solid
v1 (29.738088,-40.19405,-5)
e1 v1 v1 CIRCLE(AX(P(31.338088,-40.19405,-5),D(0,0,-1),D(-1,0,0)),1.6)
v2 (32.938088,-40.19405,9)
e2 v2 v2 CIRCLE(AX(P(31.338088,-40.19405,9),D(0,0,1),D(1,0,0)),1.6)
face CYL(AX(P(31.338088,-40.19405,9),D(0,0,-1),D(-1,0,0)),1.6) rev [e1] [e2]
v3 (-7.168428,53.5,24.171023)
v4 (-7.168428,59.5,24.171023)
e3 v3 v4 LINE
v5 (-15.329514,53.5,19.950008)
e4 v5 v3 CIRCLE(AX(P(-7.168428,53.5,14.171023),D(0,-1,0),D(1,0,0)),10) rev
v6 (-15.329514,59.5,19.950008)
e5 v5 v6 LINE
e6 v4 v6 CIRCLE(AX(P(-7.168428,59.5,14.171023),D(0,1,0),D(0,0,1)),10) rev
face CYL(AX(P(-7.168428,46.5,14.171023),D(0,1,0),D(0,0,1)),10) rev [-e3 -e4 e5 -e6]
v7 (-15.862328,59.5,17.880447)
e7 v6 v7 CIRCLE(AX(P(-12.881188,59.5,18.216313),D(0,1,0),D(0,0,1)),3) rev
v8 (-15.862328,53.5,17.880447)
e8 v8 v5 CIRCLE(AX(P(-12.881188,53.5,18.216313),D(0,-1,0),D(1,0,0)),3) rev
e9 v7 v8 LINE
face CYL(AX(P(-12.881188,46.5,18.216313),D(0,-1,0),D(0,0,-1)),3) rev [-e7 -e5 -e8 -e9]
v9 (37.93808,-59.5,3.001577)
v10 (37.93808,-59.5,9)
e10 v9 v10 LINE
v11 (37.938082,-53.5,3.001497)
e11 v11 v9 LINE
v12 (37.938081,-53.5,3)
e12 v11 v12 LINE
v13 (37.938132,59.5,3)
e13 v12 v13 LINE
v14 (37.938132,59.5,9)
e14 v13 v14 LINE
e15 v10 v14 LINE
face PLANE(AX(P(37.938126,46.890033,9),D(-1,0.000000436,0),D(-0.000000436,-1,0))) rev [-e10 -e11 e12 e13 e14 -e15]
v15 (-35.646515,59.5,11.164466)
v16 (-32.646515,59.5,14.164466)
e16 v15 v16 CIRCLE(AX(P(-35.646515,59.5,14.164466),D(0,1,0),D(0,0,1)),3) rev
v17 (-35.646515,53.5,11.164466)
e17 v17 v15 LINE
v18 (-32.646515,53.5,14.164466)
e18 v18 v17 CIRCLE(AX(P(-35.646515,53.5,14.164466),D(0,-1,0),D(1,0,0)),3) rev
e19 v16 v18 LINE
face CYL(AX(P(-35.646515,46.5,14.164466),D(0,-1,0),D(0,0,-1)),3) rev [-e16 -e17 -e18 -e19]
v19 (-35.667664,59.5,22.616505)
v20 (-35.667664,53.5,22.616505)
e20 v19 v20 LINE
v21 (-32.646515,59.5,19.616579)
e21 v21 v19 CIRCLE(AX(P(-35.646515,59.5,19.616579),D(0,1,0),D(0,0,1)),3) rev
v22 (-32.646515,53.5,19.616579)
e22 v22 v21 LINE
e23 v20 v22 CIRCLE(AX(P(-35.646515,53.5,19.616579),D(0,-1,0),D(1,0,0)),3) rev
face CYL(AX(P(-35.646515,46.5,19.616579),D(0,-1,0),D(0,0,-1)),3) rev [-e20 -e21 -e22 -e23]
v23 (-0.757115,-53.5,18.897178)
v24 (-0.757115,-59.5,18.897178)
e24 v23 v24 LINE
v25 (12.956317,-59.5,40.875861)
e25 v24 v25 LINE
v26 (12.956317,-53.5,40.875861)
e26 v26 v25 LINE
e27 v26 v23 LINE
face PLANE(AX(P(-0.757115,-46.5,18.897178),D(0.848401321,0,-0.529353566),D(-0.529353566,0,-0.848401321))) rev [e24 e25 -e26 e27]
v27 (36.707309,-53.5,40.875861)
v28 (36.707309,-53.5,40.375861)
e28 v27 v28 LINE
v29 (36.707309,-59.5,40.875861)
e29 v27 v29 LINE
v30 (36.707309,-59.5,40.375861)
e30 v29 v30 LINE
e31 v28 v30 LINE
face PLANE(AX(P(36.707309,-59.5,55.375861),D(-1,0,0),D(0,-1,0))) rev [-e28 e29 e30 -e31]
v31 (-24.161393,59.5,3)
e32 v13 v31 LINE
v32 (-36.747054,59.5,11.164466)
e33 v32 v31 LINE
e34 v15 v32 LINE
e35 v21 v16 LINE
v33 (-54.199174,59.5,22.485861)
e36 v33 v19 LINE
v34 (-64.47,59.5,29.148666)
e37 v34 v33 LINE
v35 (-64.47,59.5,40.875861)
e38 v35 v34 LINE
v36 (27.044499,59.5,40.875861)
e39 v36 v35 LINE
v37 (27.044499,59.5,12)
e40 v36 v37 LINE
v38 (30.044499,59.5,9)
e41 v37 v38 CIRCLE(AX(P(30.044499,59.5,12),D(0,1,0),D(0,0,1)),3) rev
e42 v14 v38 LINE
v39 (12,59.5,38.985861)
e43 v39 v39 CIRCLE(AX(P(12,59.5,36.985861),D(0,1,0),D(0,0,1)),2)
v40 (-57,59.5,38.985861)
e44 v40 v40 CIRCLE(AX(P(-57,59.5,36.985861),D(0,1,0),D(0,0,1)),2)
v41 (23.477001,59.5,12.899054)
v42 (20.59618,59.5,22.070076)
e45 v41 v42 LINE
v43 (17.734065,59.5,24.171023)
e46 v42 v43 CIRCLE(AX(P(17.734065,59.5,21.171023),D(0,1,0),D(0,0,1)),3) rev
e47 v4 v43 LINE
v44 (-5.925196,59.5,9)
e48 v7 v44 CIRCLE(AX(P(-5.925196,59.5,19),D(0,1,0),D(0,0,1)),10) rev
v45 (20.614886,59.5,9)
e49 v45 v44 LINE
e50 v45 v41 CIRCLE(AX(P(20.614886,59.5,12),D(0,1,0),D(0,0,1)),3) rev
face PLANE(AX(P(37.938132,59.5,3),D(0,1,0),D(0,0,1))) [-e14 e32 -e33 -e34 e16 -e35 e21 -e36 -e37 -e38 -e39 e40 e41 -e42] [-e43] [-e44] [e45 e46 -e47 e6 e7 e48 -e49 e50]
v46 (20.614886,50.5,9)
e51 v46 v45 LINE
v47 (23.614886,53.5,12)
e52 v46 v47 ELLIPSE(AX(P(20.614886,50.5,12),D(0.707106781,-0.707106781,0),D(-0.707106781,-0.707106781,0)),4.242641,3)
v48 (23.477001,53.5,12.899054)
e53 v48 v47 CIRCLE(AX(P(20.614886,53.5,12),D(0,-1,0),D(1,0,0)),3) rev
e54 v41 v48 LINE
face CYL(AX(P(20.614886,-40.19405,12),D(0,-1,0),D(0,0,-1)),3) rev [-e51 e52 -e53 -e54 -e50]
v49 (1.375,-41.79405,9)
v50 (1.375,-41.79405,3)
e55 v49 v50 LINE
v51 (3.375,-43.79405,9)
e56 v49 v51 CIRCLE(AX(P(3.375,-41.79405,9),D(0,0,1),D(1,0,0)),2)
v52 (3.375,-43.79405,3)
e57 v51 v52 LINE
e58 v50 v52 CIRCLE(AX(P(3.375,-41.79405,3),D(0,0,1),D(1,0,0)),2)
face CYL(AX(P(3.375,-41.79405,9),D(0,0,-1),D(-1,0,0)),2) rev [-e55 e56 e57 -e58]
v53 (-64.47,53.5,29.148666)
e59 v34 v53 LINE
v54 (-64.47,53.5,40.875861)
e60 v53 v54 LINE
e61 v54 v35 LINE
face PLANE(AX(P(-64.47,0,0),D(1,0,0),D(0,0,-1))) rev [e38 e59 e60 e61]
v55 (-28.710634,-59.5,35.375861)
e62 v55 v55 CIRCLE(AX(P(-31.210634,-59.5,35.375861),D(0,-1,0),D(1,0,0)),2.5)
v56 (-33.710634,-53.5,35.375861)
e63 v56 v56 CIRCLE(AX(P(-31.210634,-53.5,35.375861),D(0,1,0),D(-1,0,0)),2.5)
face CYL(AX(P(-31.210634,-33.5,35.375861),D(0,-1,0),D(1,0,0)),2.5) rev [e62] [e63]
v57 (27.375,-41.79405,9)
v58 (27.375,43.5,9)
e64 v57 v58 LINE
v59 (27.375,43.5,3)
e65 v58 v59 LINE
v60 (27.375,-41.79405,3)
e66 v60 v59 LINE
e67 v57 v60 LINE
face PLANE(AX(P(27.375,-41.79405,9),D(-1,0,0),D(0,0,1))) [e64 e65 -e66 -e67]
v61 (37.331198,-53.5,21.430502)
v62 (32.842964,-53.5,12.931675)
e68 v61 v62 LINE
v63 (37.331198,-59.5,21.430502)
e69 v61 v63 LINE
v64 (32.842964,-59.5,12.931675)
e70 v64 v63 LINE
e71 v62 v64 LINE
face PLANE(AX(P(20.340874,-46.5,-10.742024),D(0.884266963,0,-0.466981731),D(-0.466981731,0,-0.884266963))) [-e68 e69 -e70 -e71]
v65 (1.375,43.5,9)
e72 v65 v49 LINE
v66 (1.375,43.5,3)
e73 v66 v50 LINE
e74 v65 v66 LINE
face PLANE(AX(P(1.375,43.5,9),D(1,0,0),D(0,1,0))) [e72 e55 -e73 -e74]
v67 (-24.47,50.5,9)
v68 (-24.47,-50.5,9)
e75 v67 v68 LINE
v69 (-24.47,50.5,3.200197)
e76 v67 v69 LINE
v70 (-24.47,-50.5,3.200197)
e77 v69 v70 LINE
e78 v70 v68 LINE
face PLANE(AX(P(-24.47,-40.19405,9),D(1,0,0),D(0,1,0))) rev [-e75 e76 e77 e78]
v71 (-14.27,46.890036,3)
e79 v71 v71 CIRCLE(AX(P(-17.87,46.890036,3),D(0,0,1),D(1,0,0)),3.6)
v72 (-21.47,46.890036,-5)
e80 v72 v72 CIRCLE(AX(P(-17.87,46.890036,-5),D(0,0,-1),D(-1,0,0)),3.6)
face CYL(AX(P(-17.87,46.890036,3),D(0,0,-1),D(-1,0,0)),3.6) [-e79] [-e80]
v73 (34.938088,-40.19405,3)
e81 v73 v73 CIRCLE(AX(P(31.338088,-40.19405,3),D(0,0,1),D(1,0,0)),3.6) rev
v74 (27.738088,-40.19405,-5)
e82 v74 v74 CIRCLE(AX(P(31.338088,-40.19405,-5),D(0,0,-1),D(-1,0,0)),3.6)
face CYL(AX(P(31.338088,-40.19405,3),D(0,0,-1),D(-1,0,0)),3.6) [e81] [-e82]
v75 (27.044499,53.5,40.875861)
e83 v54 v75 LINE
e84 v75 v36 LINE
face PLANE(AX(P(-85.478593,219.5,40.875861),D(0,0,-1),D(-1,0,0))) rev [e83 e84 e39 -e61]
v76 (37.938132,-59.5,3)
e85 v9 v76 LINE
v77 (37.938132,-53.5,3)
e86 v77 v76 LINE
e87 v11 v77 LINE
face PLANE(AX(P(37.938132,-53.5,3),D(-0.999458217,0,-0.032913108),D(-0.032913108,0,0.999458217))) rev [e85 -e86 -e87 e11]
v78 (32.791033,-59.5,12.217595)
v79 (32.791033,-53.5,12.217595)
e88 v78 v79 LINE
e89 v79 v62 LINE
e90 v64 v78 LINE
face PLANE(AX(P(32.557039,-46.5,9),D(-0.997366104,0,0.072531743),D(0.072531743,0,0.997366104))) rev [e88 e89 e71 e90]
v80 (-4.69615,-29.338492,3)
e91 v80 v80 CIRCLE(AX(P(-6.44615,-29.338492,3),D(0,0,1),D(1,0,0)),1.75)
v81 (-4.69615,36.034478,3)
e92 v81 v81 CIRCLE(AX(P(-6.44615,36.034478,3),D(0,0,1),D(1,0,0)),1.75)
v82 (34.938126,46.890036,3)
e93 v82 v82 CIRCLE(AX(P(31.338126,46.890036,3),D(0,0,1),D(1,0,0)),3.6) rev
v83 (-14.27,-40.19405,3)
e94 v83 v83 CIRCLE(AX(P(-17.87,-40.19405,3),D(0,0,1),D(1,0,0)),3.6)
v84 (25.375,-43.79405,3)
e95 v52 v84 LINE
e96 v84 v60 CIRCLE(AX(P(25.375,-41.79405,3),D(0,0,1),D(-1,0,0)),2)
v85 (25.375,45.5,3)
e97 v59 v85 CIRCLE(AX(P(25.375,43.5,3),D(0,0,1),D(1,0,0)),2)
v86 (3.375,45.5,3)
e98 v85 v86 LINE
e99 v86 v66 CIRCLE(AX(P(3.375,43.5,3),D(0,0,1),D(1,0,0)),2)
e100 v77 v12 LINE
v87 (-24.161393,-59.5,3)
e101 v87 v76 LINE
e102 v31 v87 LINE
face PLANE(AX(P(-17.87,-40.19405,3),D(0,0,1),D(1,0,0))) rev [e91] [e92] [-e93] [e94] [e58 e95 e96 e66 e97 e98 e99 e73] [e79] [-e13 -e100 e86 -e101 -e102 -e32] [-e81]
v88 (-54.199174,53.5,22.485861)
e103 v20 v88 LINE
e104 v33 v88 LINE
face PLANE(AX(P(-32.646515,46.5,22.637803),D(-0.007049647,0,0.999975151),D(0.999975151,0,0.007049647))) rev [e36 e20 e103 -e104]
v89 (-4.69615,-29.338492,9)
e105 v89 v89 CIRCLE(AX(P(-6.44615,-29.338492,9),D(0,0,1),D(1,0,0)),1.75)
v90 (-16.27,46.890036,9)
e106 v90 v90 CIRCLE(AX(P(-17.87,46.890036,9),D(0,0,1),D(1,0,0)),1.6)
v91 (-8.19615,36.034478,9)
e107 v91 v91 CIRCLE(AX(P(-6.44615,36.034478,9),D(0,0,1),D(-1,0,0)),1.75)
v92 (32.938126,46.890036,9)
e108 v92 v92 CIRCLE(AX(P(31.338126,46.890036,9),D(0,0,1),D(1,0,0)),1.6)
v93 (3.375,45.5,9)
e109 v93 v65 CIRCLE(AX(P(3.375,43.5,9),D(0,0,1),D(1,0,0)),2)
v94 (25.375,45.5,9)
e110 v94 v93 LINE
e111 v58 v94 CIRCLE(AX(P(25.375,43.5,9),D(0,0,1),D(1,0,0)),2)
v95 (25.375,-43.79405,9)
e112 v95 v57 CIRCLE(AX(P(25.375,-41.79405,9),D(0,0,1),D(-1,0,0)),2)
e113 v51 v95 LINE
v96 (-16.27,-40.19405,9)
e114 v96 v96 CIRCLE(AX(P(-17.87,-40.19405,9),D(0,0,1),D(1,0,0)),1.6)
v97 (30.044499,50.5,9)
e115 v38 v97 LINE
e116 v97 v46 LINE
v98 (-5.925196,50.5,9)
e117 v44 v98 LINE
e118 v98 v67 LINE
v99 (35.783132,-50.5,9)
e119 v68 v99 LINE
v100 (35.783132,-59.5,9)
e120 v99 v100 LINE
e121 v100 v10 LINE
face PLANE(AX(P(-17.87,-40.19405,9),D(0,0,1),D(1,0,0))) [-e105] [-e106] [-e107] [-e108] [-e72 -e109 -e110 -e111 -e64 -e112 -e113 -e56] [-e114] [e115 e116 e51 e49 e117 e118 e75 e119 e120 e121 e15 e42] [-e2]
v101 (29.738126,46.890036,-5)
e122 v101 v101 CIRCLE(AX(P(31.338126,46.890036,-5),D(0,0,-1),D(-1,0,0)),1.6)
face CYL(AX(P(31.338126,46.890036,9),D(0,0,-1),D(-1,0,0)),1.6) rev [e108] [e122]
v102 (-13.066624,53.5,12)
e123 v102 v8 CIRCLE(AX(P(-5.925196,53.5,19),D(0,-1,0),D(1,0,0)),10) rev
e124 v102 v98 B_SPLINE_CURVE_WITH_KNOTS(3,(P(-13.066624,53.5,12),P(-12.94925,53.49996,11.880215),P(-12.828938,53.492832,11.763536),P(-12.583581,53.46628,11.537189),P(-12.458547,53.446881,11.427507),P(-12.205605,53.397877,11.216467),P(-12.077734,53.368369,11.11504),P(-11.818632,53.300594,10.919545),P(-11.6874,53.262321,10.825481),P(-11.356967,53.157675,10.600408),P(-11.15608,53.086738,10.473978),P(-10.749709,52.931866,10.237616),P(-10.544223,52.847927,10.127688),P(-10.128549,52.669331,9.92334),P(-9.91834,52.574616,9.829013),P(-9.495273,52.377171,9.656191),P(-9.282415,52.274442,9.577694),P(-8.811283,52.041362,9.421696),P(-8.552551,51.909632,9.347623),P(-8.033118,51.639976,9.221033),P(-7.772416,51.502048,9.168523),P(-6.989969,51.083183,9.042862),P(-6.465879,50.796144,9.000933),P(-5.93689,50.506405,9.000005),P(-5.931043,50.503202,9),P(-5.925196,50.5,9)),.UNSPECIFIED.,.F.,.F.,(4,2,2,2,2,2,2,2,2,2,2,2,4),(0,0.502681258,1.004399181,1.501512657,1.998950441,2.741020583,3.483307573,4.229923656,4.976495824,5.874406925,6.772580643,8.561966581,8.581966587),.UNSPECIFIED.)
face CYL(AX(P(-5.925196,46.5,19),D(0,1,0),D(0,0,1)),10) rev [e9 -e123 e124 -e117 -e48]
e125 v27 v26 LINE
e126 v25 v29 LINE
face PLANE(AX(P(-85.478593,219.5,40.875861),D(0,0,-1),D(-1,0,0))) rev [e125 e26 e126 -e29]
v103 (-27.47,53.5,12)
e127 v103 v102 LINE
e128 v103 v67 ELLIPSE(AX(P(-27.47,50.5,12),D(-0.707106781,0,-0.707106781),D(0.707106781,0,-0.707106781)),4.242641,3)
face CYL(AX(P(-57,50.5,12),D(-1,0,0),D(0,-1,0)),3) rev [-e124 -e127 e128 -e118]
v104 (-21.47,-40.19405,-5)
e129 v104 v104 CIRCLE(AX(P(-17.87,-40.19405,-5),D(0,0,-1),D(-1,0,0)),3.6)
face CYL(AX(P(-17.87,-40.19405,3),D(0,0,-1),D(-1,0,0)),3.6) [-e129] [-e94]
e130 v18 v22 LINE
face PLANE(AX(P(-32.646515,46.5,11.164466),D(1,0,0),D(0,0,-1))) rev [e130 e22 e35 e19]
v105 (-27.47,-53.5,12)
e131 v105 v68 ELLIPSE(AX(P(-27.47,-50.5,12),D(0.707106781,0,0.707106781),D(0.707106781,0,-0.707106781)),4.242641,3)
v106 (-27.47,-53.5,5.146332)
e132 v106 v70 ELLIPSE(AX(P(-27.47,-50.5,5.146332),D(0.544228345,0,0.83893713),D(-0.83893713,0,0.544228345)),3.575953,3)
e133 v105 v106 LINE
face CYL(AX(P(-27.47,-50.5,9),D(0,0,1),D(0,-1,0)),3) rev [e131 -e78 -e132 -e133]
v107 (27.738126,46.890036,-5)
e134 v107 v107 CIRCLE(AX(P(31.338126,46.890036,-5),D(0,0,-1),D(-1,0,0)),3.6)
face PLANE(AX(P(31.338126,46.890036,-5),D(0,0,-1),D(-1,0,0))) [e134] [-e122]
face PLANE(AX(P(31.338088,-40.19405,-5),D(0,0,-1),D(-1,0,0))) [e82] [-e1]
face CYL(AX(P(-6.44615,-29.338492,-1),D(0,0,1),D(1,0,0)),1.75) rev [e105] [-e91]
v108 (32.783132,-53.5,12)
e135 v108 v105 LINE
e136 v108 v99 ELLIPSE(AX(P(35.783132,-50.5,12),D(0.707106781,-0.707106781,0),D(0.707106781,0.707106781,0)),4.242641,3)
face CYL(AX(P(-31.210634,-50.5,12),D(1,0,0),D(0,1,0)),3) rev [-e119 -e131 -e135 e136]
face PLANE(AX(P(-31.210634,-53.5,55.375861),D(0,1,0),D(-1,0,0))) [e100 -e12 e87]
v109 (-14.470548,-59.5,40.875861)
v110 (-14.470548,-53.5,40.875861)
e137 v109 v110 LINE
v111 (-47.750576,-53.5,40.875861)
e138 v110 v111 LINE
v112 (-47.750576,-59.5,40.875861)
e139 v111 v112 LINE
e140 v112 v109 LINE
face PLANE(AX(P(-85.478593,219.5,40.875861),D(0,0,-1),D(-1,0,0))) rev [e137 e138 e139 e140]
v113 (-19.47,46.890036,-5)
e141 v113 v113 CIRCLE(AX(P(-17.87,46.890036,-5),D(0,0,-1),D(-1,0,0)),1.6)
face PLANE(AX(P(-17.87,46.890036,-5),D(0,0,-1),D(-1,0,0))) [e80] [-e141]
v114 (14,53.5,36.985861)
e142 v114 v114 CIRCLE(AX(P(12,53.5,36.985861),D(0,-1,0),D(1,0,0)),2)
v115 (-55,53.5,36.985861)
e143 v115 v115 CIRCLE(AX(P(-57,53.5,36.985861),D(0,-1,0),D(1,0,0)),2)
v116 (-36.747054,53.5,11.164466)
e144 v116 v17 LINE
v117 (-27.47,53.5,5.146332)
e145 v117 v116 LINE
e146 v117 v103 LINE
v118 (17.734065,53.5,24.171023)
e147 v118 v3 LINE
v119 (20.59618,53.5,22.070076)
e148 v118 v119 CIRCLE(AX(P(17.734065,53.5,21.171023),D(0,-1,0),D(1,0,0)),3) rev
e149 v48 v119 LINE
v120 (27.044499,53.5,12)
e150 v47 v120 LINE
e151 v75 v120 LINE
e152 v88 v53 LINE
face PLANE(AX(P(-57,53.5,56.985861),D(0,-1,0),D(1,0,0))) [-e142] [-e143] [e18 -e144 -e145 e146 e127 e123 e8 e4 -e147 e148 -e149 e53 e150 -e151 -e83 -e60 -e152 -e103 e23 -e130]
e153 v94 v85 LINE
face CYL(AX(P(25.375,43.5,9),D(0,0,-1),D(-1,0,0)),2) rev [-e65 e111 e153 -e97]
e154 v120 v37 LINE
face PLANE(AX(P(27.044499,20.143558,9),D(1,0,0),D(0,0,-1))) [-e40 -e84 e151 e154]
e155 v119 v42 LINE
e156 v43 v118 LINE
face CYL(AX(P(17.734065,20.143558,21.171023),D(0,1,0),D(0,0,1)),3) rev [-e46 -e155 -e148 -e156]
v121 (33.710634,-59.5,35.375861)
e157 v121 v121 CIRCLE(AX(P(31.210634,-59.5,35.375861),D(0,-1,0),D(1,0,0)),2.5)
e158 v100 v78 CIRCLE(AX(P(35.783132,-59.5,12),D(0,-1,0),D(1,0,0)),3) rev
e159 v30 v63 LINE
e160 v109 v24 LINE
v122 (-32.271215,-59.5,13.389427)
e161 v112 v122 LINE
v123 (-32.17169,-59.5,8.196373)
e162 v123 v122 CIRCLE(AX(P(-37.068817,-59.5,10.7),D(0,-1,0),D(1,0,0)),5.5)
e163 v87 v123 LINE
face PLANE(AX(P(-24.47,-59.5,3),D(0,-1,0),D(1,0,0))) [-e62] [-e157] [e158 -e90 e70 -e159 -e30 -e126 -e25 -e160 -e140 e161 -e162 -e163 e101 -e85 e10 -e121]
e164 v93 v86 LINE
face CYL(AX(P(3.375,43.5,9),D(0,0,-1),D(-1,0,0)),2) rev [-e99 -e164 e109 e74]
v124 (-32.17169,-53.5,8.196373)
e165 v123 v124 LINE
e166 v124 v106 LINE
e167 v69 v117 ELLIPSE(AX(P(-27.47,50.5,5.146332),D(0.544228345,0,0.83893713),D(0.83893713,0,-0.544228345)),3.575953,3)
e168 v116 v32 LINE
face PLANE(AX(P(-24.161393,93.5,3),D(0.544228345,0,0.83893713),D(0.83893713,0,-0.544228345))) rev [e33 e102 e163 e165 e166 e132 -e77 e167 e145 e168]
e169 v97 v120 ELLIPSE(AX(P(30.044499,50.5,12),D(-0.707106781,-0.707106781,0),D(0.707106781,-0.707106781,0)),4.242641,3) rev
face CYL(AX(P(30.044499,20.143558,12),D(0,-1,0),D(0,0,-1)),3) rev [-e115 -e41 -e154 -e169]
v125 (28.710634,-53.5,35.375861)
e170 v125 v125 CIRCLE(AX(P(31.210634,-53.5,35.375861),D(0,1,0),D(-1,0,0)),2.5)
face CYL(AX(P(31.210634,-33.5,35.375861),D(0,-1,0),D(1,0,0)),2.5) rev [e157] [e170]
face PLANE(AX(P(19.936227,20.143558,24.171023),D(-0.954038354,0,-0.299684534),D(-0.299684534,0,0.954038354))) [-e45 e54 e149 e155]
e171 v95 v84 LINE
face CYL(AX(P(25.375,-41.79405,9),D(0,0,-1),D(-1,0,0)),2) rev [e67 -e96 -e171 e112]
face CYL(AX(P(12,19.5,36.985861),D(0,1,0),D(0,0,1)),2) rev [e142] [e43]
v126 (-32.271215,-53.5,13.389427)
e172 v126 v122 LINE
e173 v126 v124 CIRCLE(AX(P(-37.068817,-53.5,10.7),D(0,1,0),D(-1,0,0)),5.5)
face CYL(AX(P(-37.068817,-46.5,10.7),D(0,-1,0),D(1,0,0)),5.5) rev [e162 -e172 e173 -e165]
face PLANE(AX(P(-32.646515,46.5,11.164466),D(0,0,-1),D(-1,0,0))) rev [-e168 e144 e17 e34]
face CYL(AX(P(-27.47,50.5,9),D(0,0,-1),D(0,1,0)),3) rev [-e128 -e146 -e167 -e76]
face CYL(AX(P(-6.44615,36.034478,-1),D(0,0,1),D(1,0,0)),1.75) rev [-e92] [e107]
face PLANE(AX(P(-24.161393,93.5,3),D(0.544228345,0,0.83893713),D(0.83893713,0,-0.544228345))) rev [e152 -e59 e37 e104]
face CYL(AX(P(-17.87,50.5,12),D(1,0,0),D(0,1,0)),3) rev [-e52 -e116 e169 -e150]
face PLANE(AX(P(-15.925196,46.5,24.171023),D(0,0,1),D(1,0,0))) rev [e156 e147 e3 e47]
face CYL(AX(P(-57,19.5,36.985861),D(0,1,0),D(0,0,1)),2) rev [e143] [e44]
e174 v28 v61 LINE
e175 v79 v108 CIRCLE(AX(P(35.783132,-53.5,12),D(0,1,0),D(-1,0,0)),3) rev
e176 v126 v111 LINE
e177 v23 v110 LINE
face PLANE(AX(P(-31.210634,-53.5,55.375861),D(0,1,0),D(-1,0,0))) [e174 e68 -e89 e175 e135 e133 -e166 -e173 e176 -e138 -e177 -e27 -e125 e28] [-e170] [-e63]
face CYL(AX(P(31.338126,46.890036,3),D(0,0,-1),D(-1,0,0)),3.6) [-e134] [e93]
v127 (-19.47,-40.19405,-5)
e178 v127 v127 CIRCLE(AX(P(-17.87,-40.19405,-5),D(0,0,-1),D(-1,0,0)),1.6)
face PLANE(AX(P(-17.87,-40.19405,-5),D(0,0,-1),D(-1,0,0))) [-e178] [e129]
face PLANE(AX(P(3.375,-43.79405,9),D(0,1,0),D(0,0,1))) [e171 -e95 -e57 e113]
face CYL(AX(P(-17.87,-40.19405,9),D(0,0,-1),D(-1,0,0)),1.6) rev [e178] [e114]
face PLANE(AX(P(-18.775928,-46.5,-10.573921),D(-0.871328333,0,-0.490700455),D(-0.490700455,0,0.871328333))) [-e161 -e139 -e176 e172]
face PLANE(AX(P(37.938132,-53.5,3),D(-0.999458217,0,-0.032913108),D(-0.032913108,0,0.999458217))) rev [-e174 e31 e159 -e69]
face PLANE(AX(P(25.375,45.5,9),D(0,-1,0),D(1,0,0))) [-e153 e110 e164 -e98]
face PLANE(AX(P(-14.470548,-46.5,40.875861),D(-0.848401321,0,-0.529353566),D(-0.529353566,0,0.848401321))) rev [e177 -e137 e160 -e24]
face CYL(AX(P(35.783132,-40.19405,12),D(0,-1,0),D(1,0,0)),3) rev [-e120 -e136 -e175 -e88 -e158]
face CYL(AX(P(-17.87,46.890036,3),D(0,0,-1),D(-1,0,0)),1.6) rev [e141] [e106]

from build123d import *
from build123d.topology import SkipClean

# Parameters (mm, degrees)
SKETCH_1_R               = 3.6
SKETCH_1_R_2             = 1.6
EXTRUDE_1_DEPTH          = 3
EXTRUDE_1_2_DEPTH        = 3
EXTRUDE_1_3_DEPTH        = 3
EXTRUDE_1_4_DEPTH        = 3
EXTRUDE_1_5_DEPTH        = 3
SKETCH_2_R               = 1.6
EXTRUDE_2_DEPTH          = 6
CUT_EXTRUDE_START        = -5
CUT_EXTRUDE_1_DEPTH      = 5
EXTRUDE_START            = -6
EXTRUDE_3_DEPTH          = 6
SKETCH_12_R              = 2.5
EXTRUDE_4_DEPTH          = 6
SKETCH_13_R              = 2
EXTRUDE_5_DEPTH          = 6
SKETCH_15_W              = 58.485860782
SKETCH_15_H              = 6
EXTRUDE_7_DEPTH          = 40
SKETCH_16_R              = 2
CUT_EXTRUDE_5_DEPTH      = 40
FILLET_1_R               = 5
CUT_EXTRUDE_6_DEPTH      = 40
SKETCH_21_W              = 57.375860782
SKETCH_21_H              = 6
EXTRUDE_8_DEPTH          = 40
CUT_EXTRUDE_7_DEPTH      = 12
CUT_EXTRUDE_7_DEPTH_BACK = 26
SKETCH_24_R              = 2.5
SKETCH_25_W              = 118.615869392
SKETCH_25_H              = 27.10726564
CUT_EXTRUDE_9_DEPTH      = 130
SKETCH_26_W              = 3
SKETCH_26_H              = 7.2
CUT_EXTRUDE_10_DEPTH     = 13
CUT_EXTRUDE_11_DEPTH     = 153
EXTRUDE_9_DEPTH          = 5.999999993
CUT_EXTRUDE_12_DEPTH     = 10
EXTRUDE_START_2          = 5
SKETCH_30_R              = 3.6
SKETCH_30_R_2            = 1.6
EXTRUDE_10_DEPTH         = 5
SKETCH_31_W              = 78.686898171
SKETCH_31_H              = 6
SKETCH_31_W_2            = 101.17730892
EXTRUDE_11_DEPTH         = 15
SKETCH_32_R              = 2.5
CUT_EXTRUDE_13_DEPTH     = 15
EXTRUDE_12_DEPTH         = 3
SKETCH_35_R              = 2
CUT_EXTRUDE_14_DEPTH     = 23
SKETCH_37_W              = 101.17730892
SKETCH_37_H              = 6
SKETCH_37_W_2            = 81.686898171
EXTRUDE_13_DEPTH         = 3
CUT_EXTRUDE_15_DEPTH     = 13
CUT_EXTRUDE_16_DEPTH     = 13
CUT_EXTRUDE_17_DEPTH     = 13
CUT_EXTRUDE_18_DEPTH     = 13
SKETCH_44_R              = 1.6
EXTRUDE_14_DEPTH         = 6
SKETCH_45_R              = 1.6
EXTRUDE_15_DEPTH         = 6
SKETCH_46_R              = 1.75
CUT_EXTRUDE_20_DEPTH     = 10
CUT_EXTRUDE_21_DEPTH     = 8
SKETCH_50_W              = 128.22859335
SKETCH_50_H              = 38.015550961
CUT_EXTRUDE_22_DEPTH     = 279
SKETCH_51_W              = 42.099918758
SKETCH_51_H              = 15.171022686
CUT_EXTRUDE_26_DEPTH     = 13
CUT_EXTRUDE_27_DEPTH     = 13
FILLET_2_R               = 10
FILLET_3_R               = 10
FILLET_4_R               = 3
EXTRUDE_16_DEPTH         = 5.999999993
FILLET_5_R               = 3
FILLET_6_R               = 3
FILLET_7_R               = 3


with BuildPart() as part:
    # 草图1 → 凸台-拉伸1 (new body)
    with BuildSketch(Plane.XY):
        with Locations((-17.87, 46.890036)):
            Circle(SKETCH_1_R)
        with Locations((-17.87, 46.890036)):
            Circle(SKETCH_1_R_2, mode=Mode.SUBTRACT)
    extrude(amount=EXTRUDE_1_DEPTH)



with BuildPart() as body_2:
    # 草图1 → Extrude 1 2 (new body)
    with BuildSketch(Plane.XY):
        with Locations((31.338126, 46.890036)):
            Circle(SKETCH_1_R)
        with Locations((31.338126, 46.890036)):
            Circle(SKETCH_1_R_2, mode=Mode.SUBTRACT)
    extrude(amount=EXTRUDE_1_2_DEPTH)


with BuildPart() as body_3:
    # 草图1 → Extrude 1 3 (new body)
    with BuildSketch(Plane.XY):
        with Locations((29.0930015, 5.590791)):
            Circle(SKETCH_1_R)
        with Locations((29.0930015, 5.590791)):
            Circle(SKETCH_1_R_2, mode=Mode.SUBTRACT)
    extrude(amount=EXTRUDE_1_3_DEPTH)


with BuildPart() as body_4:
    # 草图1 → Extrude 1 4 (new body)
    with BuildSketch(Plane.XY):
        with Locations((31.338088, -40.19405)):
            Circle(SKETCH_1_R)
        with Locations((31.338088, -40.19405)):
            Circle(SKETCH_1_R_2, mode=Mode.SUBTRACT)
    extrude(amount=EXTRUDE_1_4_DEPTH)


with BuildPart() as body_5:
    # 草图1 → Extrude 1 5 (new body)
    with BuildSketch(Plane.XY):
        with BuildLine():
            Line((-17.66382396, -32.616834919), (-20.99040196, -38.398752919))
            ThreePointArc((-20.99040196, -38.398752919), (-19.665297081, -43.31445196), (-14.74959804, -41.989347081))
            Line((-14.74959804, -41.989347081), (-11.42302004, -36.207429081))
            ThreePointArc((-11.42302004, -36.207429081), (-12.748124919, -31.29173004), (-17.66382396, -32.616834919))
        make_face()
        with Locations((-14.543422, -34.412132)):
            Circle(SKETCH_1_R_2, mode=Mode.SUBTRACT)
        with Locations((-17.87, -40.19405)):
            Circle(SKETCH_1_R_2, mode=Mode.SUBTRACT)
    extrude(amount=EXTRUDE_1_5_DEPTH)


with BuildPart() as part_1:
    add(part.part)

    add(body_2.part)  # 凸台-拉伸2 merges body 2

    add(body_3.part)  # 凸台-拉伸2 merges body 3

    add(body_4.part)  # 凸台-拉伸2 merges body 4

    add(body_5.part)  # 凸台-拉伸2 merges body 5
    # 草图2 → 凸台-拉伸2 (add)
    with BuildSketch(Plane.XY.offset(3)):
        with BuildLine():
            Line((-17.87, -46.79405), (31.338088, -46.79405))
            ThreePointArc((31.338088, -46.79405), (36.004991738, -44.860955774), (37.938088, -40.19405288))
            Line((37.938088, -40.19405288), (37.938126, 46.89003312))
            ThreePointArc((37.938126, 46.89003312), (36.005031774, 51.556939738), (31.338126, 53.490036))
            Line((31.338126, 53.490036), (-17.87, 53.490036))
            ThreePointArc((-17.87, 53.490036), (-22.536904756, 51.556940756), (-24.47, 46.890036))
            Line((-24.47, 46.890036), (-24.47, -40.19405))
            ThreePointArc((-24.47, -40.19405), (-22.536904756, -44.860954756), (-17.87, -46.79405))
        make_face()
        with Locations((-14.543422, -34.412132)):
            Circle(SKETCH_2_R, mode=Mode.SUBTRACT)
        with Locations((-17.87, -40.19405)):
            Circle(SKETCH_2_R, mode=Mode.SUBTRACT)
        with Locations((31.338088, -40.19405)):
            Circle(SKETCH_2_R, mode=Mode.SUBTRACT)
        with Locations((29.0930015, 5.590791)):
            Circle(SKETCH_2_R, mode=Mode.SUBTRACT)
        with Locations((31.338126, 46.890036)):
            Circle(SKETCH_2_R, mode=Mode.SUBTRACT)
        with Locations((-17.87, 46.890036)):
            Circle(SKETCH_2_R, mode=Mode.SUBTRACT)
        with BuildLine():
            Line((25.375000001, 45.5), (3.375000001, 45.5))
            ThreePointArc((3.375000001, 45.5), (1.960786438, 44.914213562), (1.375000001, 43.5))
            Line((1.375000001, 43.5), (1.375000001, -41.79405))
            ThreePointArc((1.375000001, -41.79405), (1.960786438, -43.208263562), (3.375000001, -43.79405))
            Line((3.375000001, -43.79405), (25.375000001, -43.79405))
            ThreePointArc((25.375000001, -43.79405), (26.789213563, -43.208263562), (27.375000001, -41.79405))
            Line((27.375000001, -41.79405), (27.375000001, 43.5))
            ThreePointArc((27.375000001, 43.5), (26.789213563, 44.914213562), (25.375000001, 45.5))
        make_face(mode=Mode.SUBTRACT)
    extrude(amount=EXTRUDE_2_DEPTH)

    # 草图3 → 切除-拉伸1 (cut)
    with BuildSketch(Plane.XY.offset(3).offset(CUT_EXTRUDE_START)):
        with BuildLine():
            Line((27.375000001, 2.427174265), (27.375000001, 8.754407735))
            ThreePointArc((27.375000001, 8.754407735), (25.4930015, 5.590791), (27.375000001, 2.427174265))
        make_face()
    extrude(amount=CUT_EXTRUDE_1_DEPTH, mode=Mode.SUBTRACT)

    # 草图10 → 凸台-拉伸3 (add)
    with BuildSketch(Plane.XY.offset(9).offset(EXTRUDE_START)):
        with BuildLine():
            Line((-24.47, 59.499999998), (-24.47, 46.890036))
            ThreePointArc((-24.47, 46.890036), (-22.536904756, 51.556940756), (-17.87, 53.490036))
            Line((-17.87, 53.490036), (31.338126, 53.490036))
            ThreePointArc((31.338126, 53.490036), (36.005031774, 51.556939738), (37.938126, 46.89003312))
            Line((37.938126, 46.89003312), (37.938131502, 59.499999998))
            Line((37.938131502, 59.499999998), (-24.47, 59.499999998))
        make_face()
        with BuildLine():
            Line((37.938079576, -59.500000002), (37.938088, -40.19405288))
            ThreePointArc((37.938088, -40.19405288), (36.004991738, -44.860955774), (31.338088, -46.79405))
            Line((31.338088, -46.79405), (-17.87, -46.79405))
            ThreePointArc((-17.87, -46.79405), (-22.536904756, -44.860954756), (-24.47, -40.19405))
            Line((-24.47, -40.19405), (-24.47, -59.500000002))
            Line((-24.47, -59.500000002), (37.938079576, -59.500000002))
        make_face()
    extrude(amount=EXTRUDE_3_DEPTH)

    # 草图12 → 凸台-拉伸4 (add)
    with BuildSketch(Plane(origin=(0, -59.500000002, 0), x_dir=(1, 0, 0), z_dir=(0, 1, 0))):
        with BuildLine():
            Line((-31.210634294, -60.375860782), (31.210634294, -60.375860782))
            ThreePointArc((31.210634294, -60.375860782), (34.687498708, -58.969106369), (36.207925379, -55.540426322))
            Line((36.207925379, -55.540426322), (37.938131503, -3))
            Line((37.938131503, -3), (-24.47, -3))
            Line((-24.47, -3), (-36.087026477, -54.270962924))
            ThreePointArc((-36.087026477, -54.270962924), (-35.117326584, -58.496398453), (-31.210634294, -60.375860782))
        make_face()
        with Locations(Location((31.210634294, -55.375860782, 0), (0, 0, 180))):
            Circle(SKETCH_12_R, mode=Mode.SUBTRACT)
        with Locations(Location((-31.210634294, -55.375860782, 0), (0, 0, 180))):
            Circle(SKETCH_12_R, mode=Mode.SUBTRACT)
    extrude(amount=EXTRUDE_4_DEPTH)

    # 草图13 → 凸台-拉伸5 (add)
    with BuildSketch(Plane.XZ.offset(-59.500000005)):
        with BuildLine():
            Line((-57, 61.485860782), (12, 61.485860782))
            ThreePointArc((12, 61.485860782), (14.537354997, 60.702287778), (16.191064272, 58.624451722))
            Line((16.191064272, 58.624451722), (37.938079576, 3.00157684))
            Line((37.938079576, 3.00157684), (-24.47, 3))
            Line((-24.47, 3), (-60.678697485, 54.39410755))
            ThreePointArc((-60.678697485, 54.39410755), (-60.994551887, 59.057950362), (-57, 61.485860782))
        make_face()
        with Locations((-57, 56.985860782)):
            Circle(SKETCH_13_R, mode=Mode.SUBTRACT)
        with Locations((12, 56.985860782)):
            Circle(SKETCH_13_R, mode=Mode.SUBTRACT)
    extrude(amount=EXTRUDE_5_DEPTH)

    # 草图15 → 凸台-拉伸7 (add)
    with BuildSketch(Plane.ZY.offset(24.47)):
        with Locations((32.242930391, 56.500000005)):
            Rectangle(SKETCH_15_W, SKETCH_15_H)
    extrude(amount=EXTRUDE_7_DEPTH)

    # 草图16 → 切除-拉伸5 (cut)
    with BuildSketch(Plane(origin=(0, 59.499999998, 0), x_dir=(1, 0, 0), z_dir=(0, 1, 0))):
        with Locations(Location((-57, -56.985860782, 0), (0, 0, 270))):
            Circle(SKETCH_16_R)
    extrude(amount=-CUT_EXTRUDE_5_DEPTH, mode=Mode.SUBTRACT)

    # 圆角1
    fillet_1_edges = [part_1.edges().sort_by_distance(p)[0] for p in [
        (-64.47, 56.500000005, 61.485860782),
    ]]
    fillet(fillet_1_edges, radius=FILLET_1_R)

    # 草图18 → 切除-拉伸6 (cut)
    with BuildSketch(Plane(origin=(0, 59.499999998, 0), x_dir=(1, 0, 0), z_dir=(0, 1, 0))):
        with BuildLine():
            ThreePointArc((10, -36.985860782), (10.585786437, -38.400074344), (12, -38.985860782))
            Line((12, -38.985860782), (12, -36.985860782))
            Line((12, -36.985860782), (10, -36.985860782))
        make_face()
        with BuildLine():
            Line((12, -36.985860782), (12, -38.985860782))
            ThreePointArc((12, -38.985860782), (13.414213562, -38.400074344), (14, -36.985860782))
            ThreePointArc((14, -36.985860782), (12, -34.985860782), (10, -36.985860782))
            Line((10, -36.985860782), (12, -36.985860782))
        make_face()
        with BuildLine():
            ThreePointArc((-59, -36.985860782), (-57, -38.985860782), (-55, -36.985860782))
            Line((-55, -36.985860782), (-59, -36.985860782))
        make_face()
        with BuildLine():
            Line((-59, -36.985860782), (-55, -36.985860782))
            ThreePointArc((-55, -36.985860782), (-57, -34.985860782), (-59, -36.985860782))
        make_face()
    extrude(amount=-CUT_EXTRUDE_6_DEPTH, mode=Mode.SUBTRACT)

    # 草图21 → 凸台-拉伸8 (add)
    with BuildSketch(Plane.ZY.offset(24.47)):
        with Locations((31.687930391, -56.500000002)):
            Rectangle(SKETCH_21_W, SKETCH_21_H)
    extrude(amount=EXTRUDE_8_DEPTH)

    # 草图24 → 切除-拉伸7 (cut, two sides: drawn at the far end of the back side and taken through both)
    with BuildSketch(Plane.XZ.offset(59.500000002).offset(-CUT_EXTRUDE_7_DEPTH_BACK)):
        with Locations((31.210634294, 35.375860782)):
            Circle(SKETCH_24_R)
        with Locations((-31.210634294, 35.375860782)):
            Circle(SKETCH_24_R)
    extrude(amount=CUT_EXTRUDE_7_DEPTH + CUT_EXTRUDE_7_DEPTH_BACK, mode=Mode.SUBTRACT)

    # 草图25 → 切除-拉伸9 (cut)
    with BuildSketch(Plane.XZ.offset(59.500000002)):
        with Locations((-10.502271589, 53.929493602)):
            Rectangle(SKETCH_25_W, SKETCH_25_H)
    extrude(amount=-CUT_EXTRUDE_9_DEPTH, mode=Mode.SUBTRACT)

    # 草图26 → 切除-拉伸10 (cut)
    with BuildSketch(Plane(origin=(37.938105539, -1.6555e-05, 0), x_dir=(0, 0, -1), z_dir=(0.9999999999999049, -4.3635986488750117e-07, 0))):
        with Locations((-1.5, 5.590803695)):
            Rectangle(SKETCH_26_W, SKETCH_26_H)
    extrude(amount=-CUT_EXTRUDE_10_DEPTH, mode=Mode.SUBTRACT)

    # 草图27 → 切除-拉伸11 (cut)
    with BuildSketch(Plane.XZ.offset(59.500000002)):
        Polygon((-64.47, 3), (-24.161392777, 3), (-64.47, 29.148665736), align=None)
    extrude(amount=-CUT_EXTRUDE_11_DEPTH, mode=Mode.SUBTRACT)

    # 草图28 → 凸台-拉伸9 (add)
    with BuildSketch(Plane(origin=(0, 59.499999998, 0), x_dir=(1, 0, 0), z_dir=(0, 1, 0))):
        Polygon((36.70730892, -40.375860782), (37.740545806, -9), (35.592860985, -9), (23.325761773, -40.375860782), align=None)
    extrude(amount=-EXTRUDE_9_DEPTH)

    # 草图29 → 切除-拉伸12 (cut)
    with BuildSketch(Plane.XZ.offset(-53.500000005)):
        Polygon((14.216898171, 40.375860782), (36.70730892, 40.375860782), (37.740545806, 9), (25.290680955, 9), align=None)
    extrude(amount=-CUT_EXTRUDE_12_DEPTH, mode=Mode.SUBTRACT)

    # 草图30 → 凸台-拉伸10 (add)
    # profile 1 of 4: a face of its own
    with SkipClean():  # the faces are left unmerged after this step: merging them gives an invalid solid
        with BuildSketch(Plane(origin=(0, 0, 0), x_dir=(-1, 0, 0), z_dir=(0, 0, -1)).offset(EXTRUDE_START_2)):
            with Locations((17.87, 46.890036)):
                Circle(SKETCH_30_R)
            with Locations((17.87, 46.890036)):
                Circle(SKETCH_30_R_2, mode=Mode.SUBTRACT)
        # profile 2 of 4: a face of its own
        with BuildSketch(Plane(origin=(0, 0, 0), x_dir=(-1, 0, 0), z_dir=(0, 0, -1)).offset(EXTRUDE_START_2)):
            with Locations((-31.338126, 46.890036)):
                Circle(SKETCH_30_R)
            with Locations((-31.338126, 46.890036)):
                Circle(SKETCH_30_R_2, mode=Mode.SUBTRACT)
        # profile 3 of 4: a face of its own
        with BuildSketch(Plane(origin=(0, 0, 0), x_dir=(-1, 0, 0), z_dir=(0, 0, -1)).offset(EXTRUDE_START_2)):
            with Locations((-31.338088, -40.19405)):
                Circle(SKETCH_30_R)
            with Locations((-31.338088, -40.19405)):
                Circle(SKETCH_30_R_2, mode=Mode.SUBTRACT)
        # profile 4 of 4: a face of its own
        with BuildSketch(Plane(origin=(0, 0, 0), x_dir=(-1, 0, 0), z_dir=(0, 0, -1)).offset(EXTRUDE_START_2)):
            with BuildLine():
                Line((17.66382396, -32.616834919), (20.99040196, -38.398752919))
                ThreePointArc((20.99040196, -38.398752919), (19.665297081, -43.31445196), (14.74959804, -41.989347081))
                Line((14.74959804, -41.989347081), (11.42302004, -36.207429081))
                ThreePointArc((11.42302004, -36.207429081), (12.748124919, -31.29173004), (17.66382396, -32.616834919))
            make_face()
            with Locations((17.87, -40.19405)):
                Circle(SKETCH_30_R_2, mode=Mode.SUBTRACT)
            with Locations((14.543422, -34.412132)):
                Circle(SKETCH_30_R_2, mode=Mode.SUBTRACT)
        extrude(amount=-EXTRUDE_10_DEPTH)

    # 草图31 → 凸台-拉伸11 (add)
    with SkipClean():  # the faces are left unmerged after this step: merging them gives an invalid solid
        with BuildSketch(Plane.XY.offset(40.375860782)):
            with Locations((-25.126550915, 56.500000005)):
                Rectangle(SKETCH_31_W, SKETCH_31_H)
            with Locations((-13.88134554, -56.500000002)):
                Rectangle(SKETCH_31_W_2, SKETCH_31_H)
        extrude(amount=EXTRUDE_11_DEPTH)

    # 草图32 → 切除-拉伸13 (cut)
    with SkipClean():  # the faces are left unmerged after this step: merging them gives an invalid solid
        with BuildSketch(Plane.XZ.offset(59.500000002)):
            with Locations((31.210634294, 35.375860782)):
                Circle(SKETCH_32_R)
            with Locations((-31.210634294, 35.375860782)):
                Circle(SKETCH_32_R)
            with Locations((31.210634294, 51.375860782)):
                Circle(SKETCH_32_R)
            with Locations((-31.210634294, 51.375860782)):
                Circle(SKETCH_32_R)
        extrude(amount=-CUT_EXTRUDE_13_DEPTH, mode=Mode.SUBTRACT)

    # 草图34 → 凸台-拉伸12 (add)
    with SkipClean():  # the faces are left unmerged after this step: merging them gives an invalid solid
        with BuildSketch(Plane(origin=(14.216898171, 0, 0), x_dir=(0, 0, -1), z_dir=(1, 0, 0))):
            Polygon((-9, 59.499999998), (-40.375860782, 59.500000005), (-55.375860782, 59.500000005), (-55.375860782, 53.500000005), (-40.375860782, 53.500000005), (-9, 53.500000005), align=None)
        extrude(amount=EXTRUDE_12_DEPTH)
    add(part_1.part.scale(1), mode=Mode.REPLACE)  # the faces are merged on a copy

    # 草图35 → 切除-拉伸14 (cut)
    with BuildSketch(Plane(origin=(0, 59.499999998, 0), x_dir=(1, 0, 0), z_dir=(0, 1, 0))):
        with Locations(Location((12, -36.985860782, 0), (0, 0, 270))):
            Circle(SKETCH_35_R)
        with Locations(Location((-57, -36.985860782, 0), (0, 0, 270))):
            Circle(SKETCH_35_R)
        with Locations(Location((-57, -52.985860782, 0), (0, 0, 270))):
            Circle(SKETCH_35_R)
        with Locations(Location((12, -52.985860782, 0), (0, 0, 270))):
            Circle(SKETCH_35_R)
    extrude(amount=-CUT_EXTRUDE_14_DEPTH, mode=Mode.SUBTRACT)

    # 草图37 → 凸台-拉伸13 (add)
    with BuildSketch(Plane.XY.offset(55.375860782)):
        with Locations((-13.88134554, -56.500000002)):
            Rectangle(SKETCH_37_W, SKETCH_37_H)
        with Locations((-23.626550915, 56.500000005)):
            Rectangle(SKETCH_37_W_2, SKETCH_37_H)
    extrude(amount=EXTRUDE_13_DEPTH)

    # 草图39 → 切除-拉伸15 (cut)
    with BuildSketch(Plane.XZ.offset(59.500000002)):
        with BuildLine():
            Line((-32.281825134, 13.408267167), (-57.605939842, 58.375860782))
            Line((-57.605939842, 58.375860782), (-64.47, 58.375860782))
            Line((-64.47, 58.375860782), (-64.47, 29.148665736))
            Line((-64.47, 29.148665736), (-32.171689656, 8.196373429))
            ThreePointArc((-32.171689656, 8.196373429), (-31.569826577, 10.805388922), (-32.271215267, 13.38942741))
            Line((-32.271215267, 13.38942741), (-32.281825134, 13.408267167))
        make_face()
    extrude(amount=-CUT_EXTRUDE_15_DEPTH, mode=Mode.SUBTRACT)

    # 草图40 → 切除-拉伸16 (cut)
    with BuildSketch(Plane.XZ.offset(59.500000002)):
        with BuildLine():
            Line((13.490514871, 59.643765057), (4.797601505, 44.136696863))
            ThreePointArc((4.797601505, 44.136696863), (0, 41.326124273), (-4.797601506, 44.136696863))
            Line((-4.797601506, 44.136696863), (-13.47016018, 59.607454838))
            Line((-13.47016018, 59.607454838), (13.490514871, 59.643765057))
        make_face()
    extrude(amount=-CUT_EXTRUDE_16_DEPTH, mode=Mode.SUBTRACT)

    # 草图41 → 切除-拉伸17 (cut)
    with BuildSketch(Plane.XZ.offset(59.500000002)):
        with BuildLine():
            Line((37.331197575, 21.430501938), (32.842963583, 12.931674733))
            ThreePointArc((32.842963583, 12.931674733), (34.801392882, 14.906779789), (37.527916252, 15.456830348))
            Line((37.527916252, 15.456830348), (37.331197575, 21.430501938))
        make_face()
    extrude(amount=-CUT_EXTRUDE_17_DEPTH, mode=Mode.SUBTRACT)

    # 草图42 → 切除-拉伸18 (cut)
    with BuildSketch(Plane.XZ.offset(59.500000002)):
        with BuildLine():
            Line((37.938079576, 9), (37.527916252, 15.456830348))
            ThreePointArc((37.527916252, 15.456830348), (34.801392882, 14.906779789), (32.842963583, 12.931674733))
            Line((32.842963583, 12.931674733), (32.557039267, 9))
            Line((32.557039267, 9), (37.938079576, 9))
        make_face()
    extrude(amount=-CUT_EXTRUDE_18_DEPTH, mode=Mode.SUBTRACT)

    # 草图44 → 凸台-拉伸14 (add)
    with BuildSketch(Plane.XY.offset(9).offset(EXTRUDE_START)):
        with Locations((29.0930015, 5.590791)):
            Circle(SKETCH_44_R)
    extrude(amount=EXTRUDE_14_DEPTH)

    # 草图45 → 凸台-拉伸15 (add)
    with BuildSketch(Plane.XY.offset(9).offset(EXTRUDE_START)):
        with Locations(Location((-14.543422, -34.412132, 0), (0, 0, 180))):
            Circle(SKETCH_45_R)
    extrude(amount=EXTRUDE_15_DEPTH)

    # 草图46 → 切除-拉伸20 (cut)
    with BuildSketch(Plane.XY.offset(9)):
        with Locations((-6.446149988, -29.338492008)):
            Circle(SKETCH_46_R)
        with Locations((-6.446149988, 36.034478008)):
            Circle(SKETCH_46_R)
    extrude(amount=-CUT_EXTRUDE_20_DEPTH, mode=Mode.SUBTRACT)

    # 草图47 → 切除-拉伸21 (cut)
    with BuildSketch(Plane(origin=(0, 0, -5), x_dir=(-1, 0, 0), z_dir=(0, 0, -1))):
        with BuildLine():
            Line((20.99040196, -38.398752919), (17.66382396, -32.616834919))
            ThreePointArc((17.66382396, -32.616834919), (12.748124919, -31.29173004), (11.42302004, -36.207429081))
            Line((11.42302004, -36.207429081), (14.74959804, -41.989347081))
            ThreePointArc((14.74959804, -41.989347081), (16.074702919, -37.07364804), (20.99040196, -38.398752919))
        make_face()
    extrude(amount=-CUT_EXTRUDE_21_DEPTH, mode=Mode.SUBTRACT)

    # 草图50 → 切除-拉伸22 (cut)
    with BuildSketch(Plane.XZ.offset(59.500000002)):
        with Locations((-21.364296676, 59.883636263)):
            Rectangle(SKETCH_50_W, SKETCH_50_H)
    extrude(amount=-CUT_EXTRUDE_22_DEPTH, mode=Mode.SUBTRACT)

    # 草图51 → 切除-拉伸26 (cut)
    with BuildSketch(Plane(origin=(0, 59.499999998, 0), x_dir=(1, 0, 0), z_dir=(0, 1, 0))):
        Polygon((-32.646514645, -11.164466094), (-32.646514645, -22.637803205), (-54.199174306, -22.485860782), (-42.560467355, -11.164466094), align=None)
        with Locations((5.124763669, -16.585511343)):
            Rectangle(SKETCH_51_W, SKETCH_51_H)
    extrude(amount=-CUT_EXTRUDE_26_DEPTH, mode=Mode.SUBTRACT)

    # 草图52 → 切除-拉伸27 (cut)
    with BuildSketch(Plane.XZ.offset(59.500000002)):
        Polygon((12.956316985, 40.875860782), (-14.470547832, 40.875860782), (-0.757115424, 18.897177868), align=None)
    extrude(amount=-CUT_EXTRUDE_27_DEPTH, mode=Mode.SUBTRACT)

    # 圆角2
    fillet_2_edges = [part_1.edges().sort_by_distance(p)[0] for p in [
        (-15.92519571, 56.500000002, 9),
    ]]
    fillet(fillet_2_edges, radius=FILLET_2_R)

    # 圆角3
    # the kernel refuses this fillet: 10 mm, written as the material it adds along each edge
    with BuildSketch(Plane(origin=(-15.92519571, 59.499999998, 24.171022686), x_dir=(0, 0, -1), z_dir=(0, -1, 0))) as fillet_3_piece_1:
        with BuildLine():
            CenterArc((10, 8.75676756), FILLET_3_R, 180, 61.125170932)
            Line((0, 8.75676756), (-0.2, 8.75676756))
            Line((-0.2, 8.75676756), (-0.2, 0))
            Line((-0.2, 0), (0, -0.2))
            ThreePointArc((0, -0.2), (2.585511343, -0.2), (5.07444314, -0.175135351))
            Line((5.07444314, -0.175135351), (5.171022686, 0))
        make_face()
    extrude(amount=5.999999993)

    # 圆角4
    fillet_4_edges = [part_1.edges().sort_by_distance(p)[0] for p in [
        (-15.92519571, 56.500000002, 19),
    ]]
    fillet(fillet_4_edges, radius=FILLET_4_R)

    # 草图53 → 凸台-拉伸16 (add)
    with BuildSketch(Plane(origin=(0, 59.499999998, 0), x_dir=(1, 0, 0), z_dir=(0, 1, 0))):
        Polygon((19.936226745, -24.171022686), (24.701780293, -9), (27.044499099, -9), (27.044499099, -40.875860782), (17.216898171, -40.875860782), (17.216898171, -31.87582207), align=None)
    extrude(amount=-EXTRUDE_16_DEPTH)

    # 圆角5
    fillet_5_edges = [part_1.edges().sort_by_distance(p)[0] for p in [
        (24.701780293, 56.500000002, 9),
        (19.936226745, 56.500000002, 24.171022686),
    ]]
    fillet(fillet_5_edges, radius=FILLET_5_R)

    # 圆角6
    fillet_6_edges = [part_1.edges().sort_by_distance(p)[0] for p in [
        (-32.646514645, 56.500000002, 11.164466094),
        (-32.646514645, 56.500000002, 22.637803205),
    ]]
    fillet(fillet_6_edges, radius=FILLET_6_R)

    # 圆角7
    fillet_7_edges = [part_1.edges().sort_by_distance(p)[0] for p in [
        (27.044499099, 56.500000002, 9),
        (22.658333305, 53.500000005, 9),
        (-24.47, 53.500000005, 6.100098561),
        (-15.197597855, 53.500000005, 9),
        (-24.47, -53.500000002, 6.100098561),
        (4.043519634, -53.500000002, 9),
        (32.557039267, -56.500000002, 9),
    ]]
    fillet(fillet_7_edges, radius=FILLET_7_R)


solid = part_1.part
